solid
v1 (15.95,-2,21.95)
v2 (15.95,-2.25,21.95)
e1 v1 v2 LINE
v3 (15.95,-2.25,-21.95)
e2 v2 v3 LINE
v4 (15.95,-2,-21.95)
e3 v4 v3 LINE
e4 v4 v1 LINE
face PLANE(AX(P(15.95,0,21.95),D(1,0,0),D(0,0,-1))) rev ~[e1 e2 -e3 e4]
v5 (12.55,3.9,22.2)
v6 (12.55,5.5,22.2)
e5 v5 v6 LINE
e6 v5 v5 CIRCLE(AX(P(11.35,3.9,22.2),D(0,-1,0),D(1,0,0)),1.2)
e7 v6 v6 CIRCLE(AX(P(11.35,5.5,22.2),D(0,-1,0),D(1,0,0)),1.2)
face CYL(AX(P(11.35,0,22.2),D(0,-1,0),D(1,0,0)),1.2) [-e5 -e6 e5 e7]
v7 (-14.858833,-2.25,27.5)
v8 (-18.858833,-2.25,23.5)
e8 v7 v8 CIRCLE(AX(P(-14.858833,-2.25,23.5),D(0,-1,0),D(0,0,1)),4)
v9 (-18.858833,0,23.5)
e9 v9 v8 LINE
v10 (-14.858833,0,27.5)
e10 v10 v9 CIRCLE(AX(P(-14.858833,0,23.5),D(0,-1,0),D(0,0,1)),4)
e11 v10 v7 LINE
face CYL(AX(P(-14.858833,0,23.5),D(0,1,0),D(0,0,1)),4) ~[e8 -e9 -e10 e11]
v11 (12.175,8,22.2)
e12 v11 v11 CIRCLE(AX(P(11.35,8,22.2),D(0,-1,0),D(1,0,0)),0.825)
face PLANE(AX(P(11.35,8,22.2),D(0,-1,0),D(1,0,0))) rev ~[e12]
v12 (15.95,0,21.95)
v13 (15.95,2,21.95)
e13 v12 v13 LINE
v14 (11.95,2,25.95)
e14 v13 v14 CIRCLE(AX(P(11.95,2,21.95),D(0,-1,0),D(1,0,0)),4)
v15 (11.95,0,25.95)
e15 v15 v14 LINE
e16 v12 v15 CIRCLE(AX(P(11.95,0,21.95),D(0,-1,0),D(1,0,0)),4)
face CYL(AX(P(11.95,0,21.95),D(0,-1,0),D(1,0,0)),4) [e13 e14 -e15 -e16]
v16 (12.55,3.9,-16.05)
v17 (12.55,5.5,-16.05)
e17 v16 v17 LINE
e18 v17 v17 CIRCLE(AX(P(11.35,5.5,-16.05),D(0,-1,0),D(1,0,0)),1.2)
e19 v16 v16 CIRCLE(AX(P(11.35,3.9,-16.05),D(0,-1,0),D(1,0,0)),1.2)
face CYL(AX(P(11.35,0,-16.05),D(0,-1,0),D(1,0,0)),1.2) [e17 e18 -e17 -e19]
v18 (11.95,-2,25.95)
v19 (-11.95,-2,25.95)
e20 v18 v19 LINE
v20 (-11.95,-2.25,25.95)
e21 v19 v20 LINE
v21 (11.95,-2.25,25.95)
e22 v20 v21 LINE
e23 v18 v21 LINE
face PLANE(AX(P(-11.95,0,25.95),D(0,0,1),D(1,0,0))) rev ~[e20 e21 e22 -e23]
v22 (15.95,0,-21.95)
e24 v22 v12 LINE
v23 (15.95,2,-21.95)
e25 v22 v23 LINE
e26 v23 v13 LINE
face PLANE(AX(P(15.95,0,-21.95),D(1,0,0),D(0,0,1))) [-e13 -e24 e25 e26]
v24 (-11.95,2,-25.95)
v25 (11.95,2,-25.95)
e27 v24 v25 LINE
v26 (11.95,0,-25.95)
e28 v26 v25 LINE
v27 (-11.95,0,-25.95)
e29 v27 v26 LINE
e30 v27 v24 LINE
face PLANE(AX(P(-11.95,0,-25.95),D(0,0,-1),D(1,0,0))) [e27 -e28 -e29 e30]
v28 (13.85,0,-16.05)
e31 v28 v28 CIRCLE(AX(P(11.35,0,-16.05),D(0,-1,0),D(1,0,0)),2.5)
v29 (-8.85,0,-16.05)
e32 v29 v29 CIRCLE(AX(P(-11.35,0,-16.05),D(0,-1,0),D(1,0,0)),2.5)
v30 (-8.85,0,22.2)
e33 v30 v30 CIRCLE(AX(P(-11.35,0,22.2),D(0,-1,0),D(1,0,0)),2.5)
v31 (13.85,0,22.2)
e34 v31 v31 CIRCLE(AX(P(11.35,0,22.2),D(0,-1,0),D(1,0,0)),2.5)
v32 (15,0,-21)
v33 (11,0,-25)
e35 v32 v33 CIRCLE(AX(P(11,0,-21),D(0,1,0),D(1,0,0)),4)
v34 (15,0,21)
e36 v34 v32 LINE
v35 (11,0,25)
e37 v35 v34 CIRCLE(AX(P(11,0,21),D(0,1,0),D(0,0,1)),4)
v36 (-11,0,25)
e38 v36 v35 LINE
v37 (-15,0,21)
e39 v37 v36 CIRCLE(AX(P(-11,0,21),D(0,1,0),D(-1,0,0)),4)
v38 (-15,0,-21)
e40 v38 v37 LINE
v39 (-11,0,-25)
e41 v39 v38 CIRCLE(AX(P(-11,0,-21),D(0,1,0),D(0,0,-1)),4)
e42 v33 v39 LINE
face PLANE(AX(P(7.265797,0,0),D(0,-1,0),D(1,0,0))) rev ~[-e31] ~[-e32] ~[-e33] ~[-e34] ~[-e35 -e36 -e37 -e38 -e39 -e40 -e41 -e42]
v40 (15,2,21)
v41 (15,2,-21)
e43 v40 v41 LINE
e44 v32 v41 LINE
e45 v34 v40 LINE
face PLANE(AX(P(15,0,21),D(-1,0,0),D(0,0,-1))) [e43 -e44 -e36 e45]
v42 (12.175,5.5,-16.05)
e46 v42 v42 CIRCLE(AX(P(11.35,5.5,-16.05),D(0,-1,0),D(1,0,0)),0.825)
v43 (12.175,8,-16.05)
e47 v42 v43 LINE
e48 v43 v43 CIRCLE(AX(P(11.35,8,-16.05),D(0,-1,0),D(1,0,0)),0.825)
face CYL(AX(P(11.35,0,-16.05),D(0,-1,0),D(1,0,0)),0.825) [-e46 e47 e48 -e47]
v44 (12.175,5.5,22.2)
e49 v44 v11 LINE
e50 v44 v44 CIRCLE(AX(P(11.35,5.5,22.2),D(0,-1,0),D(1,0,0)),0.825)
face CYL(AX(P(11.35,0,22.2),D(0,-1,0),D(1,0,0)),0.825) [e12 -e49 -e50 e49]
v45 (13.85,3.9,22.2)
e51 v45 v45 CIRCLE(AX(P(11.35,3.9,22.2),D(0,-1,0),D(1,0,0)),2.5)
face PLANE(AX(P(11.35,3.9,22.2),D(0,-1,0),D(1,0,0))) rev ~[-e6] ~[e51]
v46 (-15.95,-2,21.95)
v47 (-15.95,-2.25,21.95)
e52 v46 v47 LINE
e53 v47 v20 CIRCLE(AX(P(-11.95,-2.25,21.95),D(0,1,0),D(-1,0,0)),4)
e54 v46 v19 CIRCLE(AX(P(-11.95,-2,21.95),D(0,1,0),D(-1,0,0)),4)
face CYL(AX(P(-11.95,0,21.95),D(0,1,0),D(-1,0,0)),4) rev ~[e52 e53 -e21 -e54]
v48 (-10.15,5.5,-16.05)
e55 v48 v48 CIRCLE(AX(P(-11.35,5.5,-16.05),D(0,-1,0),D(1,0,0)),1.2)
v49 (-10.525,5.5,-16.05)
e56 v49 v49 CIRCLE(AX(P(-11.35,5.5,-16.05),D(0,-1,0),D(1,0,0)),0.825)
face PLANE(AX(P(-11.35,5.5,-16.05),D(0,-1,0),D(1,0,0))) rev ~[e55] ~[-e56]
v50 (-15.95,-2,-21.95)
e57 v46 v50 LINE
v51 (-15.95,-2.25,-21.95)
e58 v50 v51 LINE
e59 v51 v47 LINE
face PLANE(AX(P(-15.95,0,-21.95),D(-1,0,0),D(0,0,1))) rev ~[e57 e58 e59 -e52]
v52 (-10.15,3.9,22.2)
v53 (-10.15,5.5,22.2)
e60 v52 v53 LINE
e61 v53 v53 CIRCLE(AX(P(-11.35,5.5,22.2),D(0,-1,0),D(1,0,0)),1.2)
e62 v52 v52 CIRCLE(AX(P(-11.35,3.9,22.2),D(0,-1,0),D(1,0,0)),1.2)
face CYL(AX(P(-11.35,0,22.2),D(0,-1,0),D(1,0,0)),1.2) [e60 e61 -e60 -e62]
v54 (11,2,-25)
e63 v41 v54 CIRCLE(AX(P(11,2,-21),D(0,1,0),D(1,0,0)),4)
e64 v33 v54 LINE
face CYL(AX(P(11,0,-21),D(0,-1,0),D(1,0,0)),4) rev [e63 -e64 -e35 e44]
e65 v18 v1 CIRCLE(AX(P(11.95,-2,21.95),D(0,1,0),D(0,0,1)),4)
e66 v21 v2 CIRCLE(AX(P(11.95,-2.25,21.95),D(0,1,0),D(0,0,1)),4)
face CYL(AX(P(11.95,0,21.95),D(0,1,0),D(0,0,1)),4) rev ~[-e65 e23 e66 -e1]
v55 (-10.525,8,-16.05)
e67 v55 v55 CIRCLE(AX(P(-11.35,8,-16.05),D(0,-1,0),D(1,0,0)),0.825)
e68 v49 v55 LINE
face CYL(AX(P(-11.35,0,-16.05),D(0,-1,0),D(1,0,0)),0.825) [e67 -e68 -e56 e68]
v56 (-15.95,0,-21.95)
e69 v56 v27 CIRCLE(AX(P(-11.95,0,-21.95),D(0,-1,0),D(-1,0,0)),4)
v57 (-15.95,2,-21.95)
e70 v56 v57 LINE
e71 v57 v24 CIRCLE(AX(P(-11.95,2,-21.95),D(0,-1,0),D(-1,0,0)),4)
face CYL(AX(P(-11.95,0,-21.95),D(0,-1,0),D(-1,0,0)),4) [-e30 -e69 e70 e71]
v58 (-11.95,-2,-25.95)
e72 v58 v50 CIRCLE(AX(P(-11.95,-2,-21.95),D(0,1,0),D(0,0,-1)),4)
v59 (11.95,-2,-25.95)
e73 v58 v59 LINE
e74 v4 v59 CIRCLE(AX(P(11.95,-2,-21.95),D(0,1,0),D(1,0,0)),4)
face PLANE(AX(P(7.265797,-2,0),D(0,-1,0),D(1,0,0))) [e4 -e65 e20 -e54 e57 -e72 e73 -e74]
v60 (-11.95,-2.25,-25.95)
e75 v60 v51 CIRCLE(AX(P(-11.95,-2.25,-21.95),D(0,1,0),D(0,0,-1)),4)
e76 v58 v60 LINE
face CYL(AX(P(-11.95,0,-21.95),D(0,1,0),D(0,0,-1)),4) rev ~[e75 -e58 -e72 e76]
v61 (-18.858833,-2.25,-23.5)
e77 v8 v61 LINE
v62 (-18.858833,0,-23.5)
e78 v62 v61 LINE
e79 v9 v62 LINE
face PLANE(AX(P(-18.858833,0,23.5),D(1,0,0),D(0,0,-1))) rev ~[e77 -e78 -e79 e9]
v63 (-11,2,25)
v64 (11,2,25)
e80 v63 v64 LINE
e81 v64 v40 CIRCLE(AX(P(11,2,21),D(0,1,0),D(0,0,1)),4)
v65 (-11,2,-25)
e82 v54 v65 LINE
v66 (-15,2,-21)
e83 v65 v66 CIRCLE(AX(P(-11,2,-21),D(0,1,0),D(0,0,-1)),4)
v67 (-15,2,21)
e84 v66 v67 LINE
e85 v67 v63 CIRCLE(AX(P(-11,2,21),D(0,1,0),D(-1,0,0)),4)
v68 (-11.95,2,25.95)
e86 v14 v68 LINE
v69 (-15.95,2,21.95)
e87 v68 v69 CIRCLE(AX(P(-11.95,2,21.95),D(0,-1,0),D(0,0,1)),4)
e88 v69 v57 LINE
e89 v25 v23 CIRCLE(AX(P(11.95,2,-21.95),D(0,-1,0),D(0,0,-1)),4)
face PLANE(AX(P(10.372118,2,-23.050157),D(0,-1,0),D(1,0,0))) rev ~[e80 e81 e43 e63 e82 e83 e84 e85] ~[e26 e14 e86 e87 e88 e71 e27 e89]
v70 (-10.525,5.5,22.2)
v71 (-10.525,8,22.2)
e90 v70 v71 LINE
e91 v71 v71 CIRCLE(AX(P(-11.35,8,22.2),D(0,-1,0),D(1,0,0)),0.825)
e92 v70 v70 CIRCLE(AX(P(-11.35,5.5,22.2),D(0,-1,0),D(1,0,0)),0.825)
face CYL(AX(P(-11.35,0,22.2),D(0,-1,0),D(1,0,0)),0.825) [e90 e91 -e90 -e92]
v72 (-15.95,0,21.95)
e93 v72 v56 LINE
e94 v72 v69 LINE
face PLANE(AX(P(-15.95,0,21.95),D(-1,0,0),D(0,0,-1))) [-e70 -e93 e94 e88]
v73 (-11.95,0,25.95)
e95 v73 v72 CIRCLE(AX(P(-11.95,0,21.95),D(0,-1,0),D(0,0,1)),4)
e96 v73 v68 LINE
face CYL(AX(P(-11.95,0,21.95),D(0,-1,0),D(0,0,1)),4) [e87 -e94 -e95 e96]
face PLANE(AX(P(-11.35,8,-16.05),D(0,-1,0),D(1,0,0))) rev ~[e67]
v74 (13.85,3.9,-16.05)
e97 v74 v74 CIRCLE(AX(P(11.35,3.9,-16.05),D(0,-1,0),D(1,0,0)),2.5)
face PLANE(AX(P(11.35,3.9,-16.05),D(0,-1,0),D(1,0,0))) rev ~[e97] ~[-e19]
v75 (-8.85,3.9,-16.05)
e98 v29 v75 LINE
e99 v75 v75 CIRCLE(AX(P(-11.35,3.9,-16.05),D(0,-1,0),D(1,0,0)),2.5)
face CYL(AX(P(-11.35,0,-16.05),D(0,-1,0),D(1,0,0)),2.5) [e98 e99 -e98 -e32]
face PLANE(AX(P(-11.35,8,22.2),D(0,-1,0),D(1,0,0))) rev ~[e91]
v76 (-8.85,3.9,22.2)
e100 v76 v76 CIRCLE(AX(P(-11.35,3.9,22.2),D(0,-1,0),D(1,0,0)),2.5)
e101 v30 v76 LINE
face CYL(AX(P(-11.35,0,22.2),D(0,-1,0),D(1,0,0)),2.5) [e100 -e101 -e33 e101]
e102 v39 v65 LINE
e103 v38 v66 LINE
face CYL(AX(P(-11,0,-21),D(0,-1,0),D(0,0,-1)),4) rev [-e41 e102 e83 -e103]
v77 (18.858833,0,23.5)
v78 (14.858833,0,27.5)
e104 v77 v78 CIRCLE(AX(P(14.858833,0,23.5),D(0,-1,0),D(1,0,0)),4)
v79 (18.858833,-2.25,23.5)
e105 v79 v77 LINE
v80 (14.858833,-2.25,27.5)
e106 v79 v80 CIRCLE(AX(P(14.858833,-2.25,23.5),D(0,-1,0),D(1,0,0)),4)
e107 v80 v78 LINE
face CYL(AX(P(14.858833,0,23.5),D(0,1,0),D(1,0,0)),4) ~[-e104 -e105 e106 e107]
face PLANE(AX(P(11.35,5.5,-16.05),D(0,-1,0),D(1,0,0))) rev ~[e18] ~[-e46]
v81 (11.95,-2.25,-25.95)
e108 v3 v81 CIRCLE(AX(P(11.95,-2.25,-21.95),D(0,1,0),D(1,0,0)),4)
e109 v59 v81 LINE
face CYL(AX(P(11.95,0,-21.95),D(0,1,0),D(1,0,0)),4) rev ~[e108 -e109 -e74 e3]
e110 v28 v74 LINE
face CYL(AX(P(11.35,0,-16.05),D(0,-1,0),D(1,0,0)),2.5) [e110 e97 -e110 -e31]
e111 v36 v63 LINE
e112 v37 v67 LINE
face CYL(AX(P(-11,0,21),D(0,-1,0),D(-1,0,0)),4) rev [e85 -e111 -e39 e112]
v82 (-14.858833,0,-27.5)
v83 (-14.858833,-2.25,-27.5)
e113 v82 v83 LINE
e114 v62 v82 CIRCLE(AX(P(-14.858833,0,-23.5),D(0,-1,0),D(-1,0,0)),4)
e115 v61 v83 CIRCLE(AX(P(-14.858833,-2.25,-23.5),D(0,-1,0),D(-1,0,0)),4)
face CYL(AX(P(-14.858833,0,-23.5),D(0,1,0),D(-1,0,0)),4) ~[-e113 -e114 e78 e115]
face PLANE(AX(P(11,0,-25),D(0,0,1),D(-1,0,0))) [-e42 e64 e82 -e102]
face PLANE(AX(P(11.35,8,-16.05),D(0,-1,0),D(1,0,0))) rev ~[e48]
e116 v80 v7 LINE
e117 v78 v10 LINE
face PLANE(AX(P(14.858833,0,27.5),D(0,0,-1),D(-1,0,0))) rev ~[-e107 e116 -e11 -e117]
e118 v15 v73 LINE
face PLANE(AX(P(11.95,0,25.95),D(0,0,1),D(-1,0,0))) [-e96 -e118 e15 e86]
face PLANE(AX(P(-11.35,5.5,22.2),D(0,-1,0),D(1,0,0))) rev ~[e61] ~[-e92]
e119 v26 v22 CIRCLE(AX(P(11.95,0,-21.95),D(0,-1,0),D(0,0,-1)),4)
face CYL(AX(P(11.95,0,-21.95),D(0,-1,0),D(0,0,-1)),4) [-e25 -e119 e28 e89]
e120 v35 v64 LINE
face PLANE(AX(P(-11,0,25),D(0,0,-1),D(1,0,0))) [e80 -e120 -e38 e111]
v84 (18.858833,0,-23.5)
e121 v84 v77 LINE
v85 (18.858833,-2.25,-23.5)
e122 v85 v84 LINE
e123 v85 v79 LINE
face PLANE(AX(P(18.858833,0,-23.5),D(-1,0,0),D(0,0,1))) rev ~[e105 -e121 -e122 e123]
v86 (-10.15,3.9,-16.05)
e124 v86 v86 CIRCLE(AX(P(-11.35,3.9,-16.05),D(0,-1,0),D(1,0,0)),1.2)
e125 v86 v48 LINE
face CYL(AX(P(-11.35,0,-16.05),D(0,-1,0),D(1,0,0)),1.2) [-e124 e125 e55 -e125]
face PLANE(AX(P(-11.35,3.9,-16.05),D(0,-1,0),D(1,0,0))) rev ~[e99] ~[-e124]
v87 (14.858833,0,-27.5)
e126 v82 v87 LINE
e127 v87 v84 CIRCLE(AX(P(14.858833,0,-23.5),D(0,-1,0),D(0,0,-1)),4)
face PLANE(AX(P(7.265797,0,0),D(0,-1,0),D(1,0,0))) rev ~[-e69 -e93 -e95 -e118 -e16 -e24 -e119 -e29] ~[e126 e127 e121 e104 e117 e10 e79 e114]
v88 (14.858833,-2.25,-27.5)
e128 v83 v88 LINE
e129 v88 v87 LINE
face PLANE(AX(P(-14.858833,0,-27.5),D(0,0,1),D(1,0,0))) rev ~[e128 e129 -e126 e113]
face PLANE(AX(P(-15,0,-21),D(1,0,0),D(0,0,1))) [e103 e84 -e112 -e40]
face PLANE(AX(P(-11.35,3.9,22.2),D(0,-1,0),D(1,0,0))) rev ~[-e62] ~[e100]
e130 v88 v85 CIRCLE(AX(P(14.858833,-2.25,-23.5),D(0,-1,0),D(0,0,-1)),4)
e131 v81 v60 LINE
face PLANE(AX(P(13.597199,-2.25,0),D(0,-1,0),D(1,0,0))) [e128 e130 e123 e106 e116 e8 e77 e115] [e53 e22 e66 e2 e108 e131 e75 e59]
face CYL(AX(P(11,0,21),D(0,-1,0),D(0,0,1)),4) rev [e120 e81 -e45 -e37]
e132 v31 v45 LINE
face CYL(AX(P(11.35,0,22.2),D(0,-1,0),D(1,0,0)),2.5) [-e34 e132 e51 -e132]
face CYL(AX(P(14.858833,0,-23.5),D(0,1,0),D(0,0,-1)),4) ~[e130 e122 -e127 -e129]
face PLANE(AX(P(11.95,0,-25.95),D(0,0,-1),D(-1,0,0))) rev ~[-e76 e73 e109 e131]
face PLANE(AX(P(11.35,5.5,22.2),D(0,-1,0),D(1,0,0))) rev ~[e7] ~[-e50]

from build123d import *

# Parameters (mm, degrees)
F0_R     = 2.5
F0_W     = 0.95
F0_H     = 30
F0_R_2   = 1.2
F0_R_3   = 0.825
F1_DEPTH = 2
F2_DEPTH = 2
F3_DEPTH = 2.25
F4_DEPTH = 8
F5_DEPTH = 5.5
F6_DEPTH = 3.9


# Not quite as in the source:
# - a feature names something its author has since deleted; it is built from what else it names


with BuildPart() as f1:
    # F0 (on Front) → F1 (new body)
    with BuildSketch(Plane.XZ):
        with BuildLine():
            Line((0, 25), (0, -25))
            Line((0, -25), (11, -25))
            ThreePointArc((11, -25), (13.8284271247, -23.8284271247), (15, -21))
            Line((15, -21), (15, -15))
            Line((15, -15), (15, 15))
            Line((15, 15), (15, 21))
            ThreePointArc((15, 21), (13.8284271247, 23.8284271247), (11, 25))
            Line((11, 25), (0, 25))
        make_face()
        with Locations((11.35, -16.05)):
            Circle(F0_R, mode=Mode.SUBTRACT)
        with Locations((11.35, 22.2)):
            Circle(F0_R, mode=Mode.SUBTRACT)
        with BuildLine():
            Line((-11, -25), (0, -25))
            Line((0, -25), (0, 25))
            Line((0, 25), (-11, 25))
            ThreePointArc((-11, 25), (-13.8284271247, 23.8284271247), (-15, 21))
            Line((-15, 21), (-15, 15))
            Line((-15, 15), (-15, -15))
            Line((-15, -15), (-15, -21))
            ThreePointArc((-15, -21), (-13.8284271247, -23.8284271247), (-11, -25))
        make_face()
        with Locations((-11.35, -16.05)):
            Circle(F0_R, mode=Mode.SUBTRACT)
        with Locations((-11.35, 22.2)):
            Circle(F0_R, mode=Mode.SUBTRACT)
        with BuildLine():
            Line((0, -27.5), (0, -25.95))
            Line((0, -25.95), (-11.95, -25.95))
            ThreePointArc((-11.95, -25.95), (-14.7784271247, -24.7784271247), (-15.95, -21.95))
            Line((-15.95, -21.95), (-15.95, -15))
            Line((-15.95, -15), (-15.95, 15))
            Line((-15.95, 15), (-15.95, 21.95))
            ThreePointArc((-15.95, 21.95), (-14.7784271247, 24.7784271247), (-11.95, 25.95))
            Line((-11.95, 25.95), (0, 25.95))
            Line((0, 25.95), (0, 27.5))
            Line((0, 27.5), (-14.8588332385, 27.5))
            ThreePointArc((-14.8588332385, 27.5), (-17.6872603632, 26.3284271247), (-18.8588332385, 23.5))
            Line((-18.8588332385, 23.5), (-18.8588332385, -23.5))
            ThreePointArc((-18.8588332385, -23.5), (-17.6872603632, -26.3284271247), (-14.8588332385, -27.5))
            Line((-14.8588332385, -27.5), (0, -27.5))
        make_face()
        with BuildLine():
            ThreePointArc((15.95, -21.95), (14.7784271247, -24.7784271247), (11.95, -25.95))
            Line((11.95, -25.95), (0, -25.95))
            Line((0, -25.95), (0, -27.5))
            Line((0, -27.5), (14.8588332385, -27.5))
            ThreePointArc((14.8588332385, -27.5), (17.6872603632, -26.3284271247), (18.8588332385, -23.5))
            Line((18.8588332385, -23.5), (18.8588332385, 23.5))
            ThreePointArc((18.8588332385, 23.5), (17.6872603632, 26.3284271247), (14.8588332385, 27.5))
            Line((14.8588332385, 27.5), (0, 27.5))
            Line((0, 27.5), (0, 25.95))
            Line((0, 25.95), (11.95, 25.95))
            ThreePointArc((11.95, 25.95), (14.7784271247, 24.7784271247), (15.95, 21.95))
            Line((15.95, 21.95), (15.95, 15))
            Line((15.95, 15), (15.95, -15))
            Line((15.95, -15), (15.95, -21.95))
        make_face()
        with Locations((15.475, 0)):
            Rectangle(F0_W, F0_H)
        with Locations((-15.475, 0)):
            Rectangle(F0_W, F0_H)
        with BuildLine():
            Line((-11, 25), (0, 25))
            Line((0, 25), (0, 25.95))
            Line((0, 25.95), (-11.95, 25.95))
            ThreePointArc((-11.95, 25.95), (-14.7784271247, 24.7784271247), (-15.95, 21.95))
            Line((-15.95, 21.95), (-15.95, 15))
            Line((-15.95, 15), (-15, 15))
            Line((-15, 15), (-15, 21))
            ThreePointArc((-15, 21), (-13.8284271247, 23.8284271247), (-11, 25))
        make_face()
        with BuildLine():
            Line((0, 25.95), (0, 25))
            Line((0, 25), (11, 25))
            ThreePointArc((11, 25), (13.8284271247, 23.8284271247), (15, 21))
            Line((15, 21), (15, 15))
            Line((15, 15), (15.95, 15))
            Line((15.95, 15), (15.95, 21.95))
            ThreePointArc((15.95, 21.95), (14.7784271247, 24.7784271247), (11.95, 25.95))
            Line((11.95, 25.95), (0, 25.95))
        make_face()
        with BuildLine():
            Line((0, -25.95), (11.95, -25.95))
            ThreePointArc((11.95, -25.95), (14.7784271247, -24.7784271247), (15.95, -21.95))
            Line((15.95, -21.95), (15.95, -15))
            Line((15.95, -15), (15, -15))
            Line((15, -15), (15, -21))
            ThreePointArc((15, -21), (13.8284271247, -23.8284271247), (11, -25))
            Line((11, -25), (0, -25))
            Line((0, -25), (0, -25.95))
        make_face()
        with BuildLine():
            Line((-11.95, -25.95), (0, -25.95))
            Line((0, -25.95), (0, -25))
            Line((0, -25), (-11, -25))
            ThreePointArc((-11, -25), (-13.8284271247, -23.8284271247), (-15, -21))
            Line((-15, -21), (-15, -15))
            Line((-15, -15), (-15.95, -15))
            Line((-15.95, -15), (-15.95, -21.95))
            ThreePointArc((-15.95, -21.95), (-14.7784271247, -24.7784271247), (-11.95, -25.95))
        make_face()
        with Locations((11.35, -16.05)):
            Circle(F0_R)
        with Locations((11.35, -16.05)):
            Circle(F0_R_2, mode=Mode.SUBTRACT)
        with Locations((-11.35, -16.05)):
            Circle(F0_R)
        with Locations((-11.35, -16.05)):
            Circle(F0_R_2, mode=Mode.SUBTRACT)
        with Locations((11.35, 22.2)):
            Circle(F0_R)
        with Locations((11.35, 22.2)):
            Circle(F0_R_2, mode=Mode.SUBTRACT)
        with Locations((-11.35, 22.2)):
            Circle(F0_R)
        with Locations((-11.35, 22.2)):
            Circle(F0_R_2, mode=Mode.SUBTRACT)
        with Locations((-11.35, -16.05)):
            Circle(F0_R_2)
        with Locations((-11.35, -16.05)):
            Circle(F0_R_3, mode=Mode.SUBTRACT)
        with Locations((11.35, 22.2)):
            Circle(F0_R_2)
        with Locations((11.35, 22.2)):
            Circle(F0_R_3, mode=Mode.SUBTRACT)
        with Locations((-11.35, 22.2)):
            Circle(F0_R_2)
        with Locations((-11.35, 22.2)):
            Circle(F0_R_3, mode=Mode.SUBTRACT)
        with Locations((11.35, -16.05)):
            Circle(F0_R_2)
        with Locations((11.35, -16.05)):
            Circle(F0_R_3, mode=Mode.SUBTRACT)
        with Locations((-11.35, -16.05)):
            Circle(F0_R_3)
        with Locations((11.35, -16.05)):
            Circle(F0_R_3)
        with Locations((11.35, 22.2)):
            Circle(F0_R_3)
        with Locations((-11.35, 22.2)):
            Circle(F0_R_3)
    extrude(amount=F1_DEPTH)

    # F0 (on Front) → F2 (join)
    with BuildSketch(Plane.XZ):
        with BuildLine():
            Line((0, -25.95), (11.95, -25.95))
            ThreePointArc((11.95, -25.95), (14.7784271247, -24.7784271247), (15.95, -21.95))
            Line((15.95, -21.95), (15.95, -15))
            Line((15.95, -15), (15, -15))
            Line((15, -15), (15, -21))
            ThreePointArc((15, -21), (13.8284271247, -23.8284271247), (11, -25))
            Line((11, -25), (0, -25))
            Line((0, -25), (0, -25.95))
        make_face()
        with Locations((15.475, 0)):
            Rectangle(F0_W, F0_H)
        with BuildLine():
            Line((0, 25.95), (0, 25))
            Line((0, 25), (11, 25))
            ThreePointArc((11, 25), (13.8284271247, 23.8284271247), (15, 21))
            Line((15, 21), (15, 15))
            Line((15, 15), (15.95, 15))
            Line((15.95, 15), (15.95, 21.95))
            ThreePointArc((15.95, 21.95), (14.7784271247, 24.7784271247), (11.95, 25.95))
            Line((11.95, 25.95), (0, 25.95))
        make_face()
        with BuildLine():
            Line((-11.95, -25.95), (0, -25.95))
            Line((0, -25.95), (0, -25))
            Line((0, -25), (-11, -25))
            ThreePointArc((-11, -25), (-13.8284271247, -23.8284271247), (-15, -21))
            Line((-15, -21), (-15, -15))
            Line((-15, -15), (-15.95, -15))
            Line((-15.95, -15), (-15.95, -21.95))
            ThreePointArc((-15.95, -21.95), (-14.7784271247, -24.7784271247), (-11.95, -25.95))
        make_face()
        with Locations((-15.475, 0)):
            Rectangle(F0_W, F0_H)
        with BuildLine():
            Line((-11, 25), (0, 25))
            Line((0, 25), (0, 25.95))
            Line((0, 25.95), (-11.95, 25.95))
            ThreePointArc((-11.95, 25.95), (-14.7784271247, 24.7784271247), (-15.95, 21.95))
            Line((-15.95, 21.95), (-15.95, 15))
            Line((-15.95, 15), (-15, 15))
            Line((-15, 15), (-15, 21))
            ThreePointArc((-15, 21), (-13.8284271247, 23.8284271247), (-11, 25))
        make_face()
    extrude(amount=-F2_DEPTH)

    # F0 (on Front) → F3 (join)
    with BuildSketch(Plane.XZ):
        with BuildLine():
            ThreePointArc((15.95, -21.95), (14.7784271247, -24.7784271247), (11.95, -25.95))
            Line((11.95, -25.95), (0, -25.95))
            Line((0, -25.95), (0, -27.5))
            Line((0, -27.5), (14.8588332385, -27.5))
            ThreePointArc((14.8588332385, -27.5), (17.6872603632, -26.3284271247), (18.8588332385, -23.5))
            Line((18.8588332385, -23.5), (18.8588332385, 23.5))
            ThreePointArc((18.8588332385, 23.5), (17.6872603632, 26.3284271247), (14.8588332385, 27.5))
            Line((14.8588332385, 27.5), (0, 27.5))
            Line((0, 27.5), (0, 25.95))
            Line((0, 25.95), (11.95, 25.95))
            ThreePointArc((11.95, 25.95), (14.7784271247, 24.7784271247), (15.95, 21.95))
            Line((15.95, 21.95), (15.95, 15))
            Line((15.95, 15), (15.95, -15))
            Line((15.95, -15), (15.95, -21.95))
        make_face()
        with BuildLine():
            Line((0, -27.5), (0, -25.95))
            Line((0, -25.95), (-11.95, -25.95))
            ThreePointArc((-11.95, -25.95), (-14.7784271247, -24.7784271247), (-15.95, -21.95))
            Line((-15.95, -21.95), (-15.95, -15))
            Line((-15.95, -15), (-15.95, 15))
            Line((-15.95, 15), (-15.95, 21.95))
            ThreePointArc((-15.95, 21.95), (-14.7784271247, 24.7784271247), (-11.95, 25.95))
            Line((-11.95, 25.95), (0, 25.95))
            Line((0, 25.95), (0, 27.5))
            Line((0, 27.5), (-14.8588332385, 27.5))
            ThreePointArc((-14.8588332385, 27.5), (-17.6872603632, 26.3284271247), (-18.8588332385, 23.5))
            Line((-18.8588332385, 23.5), (-18.8588332385, -23.5))
            ThreePointArc((-18.8588332385, -23.5), (-17.6872603632, -26.3284271247), (-14.8588332385, -27.5))
            Line((-14.8588332385, -27.5), (0, -27.5))
        make_face()
    extrude(amount=F3_DEPTH)

    # F0 (on Front) → F4 (join)
    with BuildSketch(Plane.XZ):
        with Locations((11.35, -16.05)):
            Circle(F0_R_3)
        with Locations((-11.35, -16.05)):
            Circle(F0_R_3)
        with Locations((-11.35, 22.2)):
            Circle(F0_R_3)
        with Locations((11.35, 22.2)):
            Circle(F0_R_3)
    extrude(amount=-F4_DEPTH)

    # F0 (on Front) → F5 (join)
    with BuildSketch(Plane.XZ):
        with Locations((11.35, -16.05)):
            Circle(F0_R_2)
        with Locations((11.35, -16.05)):
            Circle(F0_R_3, mode=Mode.SUBTRACT)
        with Locations((-11.35, -16.05)):
            Circle(F0_R_2)
        with Locations((-11.35, -16.05)):
            Circle(F0_R_3, mode=Mode.SUBTRACT)
        with Locations((-11.35, 22.2)):
            Circle(F0_R_2)
        with Locations((-11.35, 22.2)):
            Circle(F0_R_3, mode=Mode.SUBTRACT)
        with Locations((11.35, 22.2)):
            Circle(F0_R_2)
        with Locations((11.35, 22.2)):
            Circle(F0_R_3, mode=Mode.SUBTRACT)
    extrude(amount=-F5_DEPTH)

    # F0 (on Front) → F6 (join)
    with BuildSketch(Plane.XZ):
        with Locations((11.35, 22.2)):
            Circle(F0_R)
        with Locations((11.35, 22.2)):
            Circle(F0_R_2, mode=Mode.SUBTRACT)
        with Locations((-11.35, 22.2)):
            Circle(F0_R)
        with Locations((-11.35, 22.2)):
            Circle(F0_R_2, mode=Mode.SUBTRACT)
        with Locations((11.35, -16.05)):
            Circle(F0_R)
        with Locations((11.35, -16.05)):
            Circle(F0_R_2, mode=Mode.SUBTRACT)
        with Locations((-11.35, -16.05)):
            Circle(F0_R)
        with Locations((-11.35, -16.05)):
            Circle(F0_R_2, mode=Mode.SUBTRACT)
    extrude(amount=-F6_DEPTH)


solid = f1.part
